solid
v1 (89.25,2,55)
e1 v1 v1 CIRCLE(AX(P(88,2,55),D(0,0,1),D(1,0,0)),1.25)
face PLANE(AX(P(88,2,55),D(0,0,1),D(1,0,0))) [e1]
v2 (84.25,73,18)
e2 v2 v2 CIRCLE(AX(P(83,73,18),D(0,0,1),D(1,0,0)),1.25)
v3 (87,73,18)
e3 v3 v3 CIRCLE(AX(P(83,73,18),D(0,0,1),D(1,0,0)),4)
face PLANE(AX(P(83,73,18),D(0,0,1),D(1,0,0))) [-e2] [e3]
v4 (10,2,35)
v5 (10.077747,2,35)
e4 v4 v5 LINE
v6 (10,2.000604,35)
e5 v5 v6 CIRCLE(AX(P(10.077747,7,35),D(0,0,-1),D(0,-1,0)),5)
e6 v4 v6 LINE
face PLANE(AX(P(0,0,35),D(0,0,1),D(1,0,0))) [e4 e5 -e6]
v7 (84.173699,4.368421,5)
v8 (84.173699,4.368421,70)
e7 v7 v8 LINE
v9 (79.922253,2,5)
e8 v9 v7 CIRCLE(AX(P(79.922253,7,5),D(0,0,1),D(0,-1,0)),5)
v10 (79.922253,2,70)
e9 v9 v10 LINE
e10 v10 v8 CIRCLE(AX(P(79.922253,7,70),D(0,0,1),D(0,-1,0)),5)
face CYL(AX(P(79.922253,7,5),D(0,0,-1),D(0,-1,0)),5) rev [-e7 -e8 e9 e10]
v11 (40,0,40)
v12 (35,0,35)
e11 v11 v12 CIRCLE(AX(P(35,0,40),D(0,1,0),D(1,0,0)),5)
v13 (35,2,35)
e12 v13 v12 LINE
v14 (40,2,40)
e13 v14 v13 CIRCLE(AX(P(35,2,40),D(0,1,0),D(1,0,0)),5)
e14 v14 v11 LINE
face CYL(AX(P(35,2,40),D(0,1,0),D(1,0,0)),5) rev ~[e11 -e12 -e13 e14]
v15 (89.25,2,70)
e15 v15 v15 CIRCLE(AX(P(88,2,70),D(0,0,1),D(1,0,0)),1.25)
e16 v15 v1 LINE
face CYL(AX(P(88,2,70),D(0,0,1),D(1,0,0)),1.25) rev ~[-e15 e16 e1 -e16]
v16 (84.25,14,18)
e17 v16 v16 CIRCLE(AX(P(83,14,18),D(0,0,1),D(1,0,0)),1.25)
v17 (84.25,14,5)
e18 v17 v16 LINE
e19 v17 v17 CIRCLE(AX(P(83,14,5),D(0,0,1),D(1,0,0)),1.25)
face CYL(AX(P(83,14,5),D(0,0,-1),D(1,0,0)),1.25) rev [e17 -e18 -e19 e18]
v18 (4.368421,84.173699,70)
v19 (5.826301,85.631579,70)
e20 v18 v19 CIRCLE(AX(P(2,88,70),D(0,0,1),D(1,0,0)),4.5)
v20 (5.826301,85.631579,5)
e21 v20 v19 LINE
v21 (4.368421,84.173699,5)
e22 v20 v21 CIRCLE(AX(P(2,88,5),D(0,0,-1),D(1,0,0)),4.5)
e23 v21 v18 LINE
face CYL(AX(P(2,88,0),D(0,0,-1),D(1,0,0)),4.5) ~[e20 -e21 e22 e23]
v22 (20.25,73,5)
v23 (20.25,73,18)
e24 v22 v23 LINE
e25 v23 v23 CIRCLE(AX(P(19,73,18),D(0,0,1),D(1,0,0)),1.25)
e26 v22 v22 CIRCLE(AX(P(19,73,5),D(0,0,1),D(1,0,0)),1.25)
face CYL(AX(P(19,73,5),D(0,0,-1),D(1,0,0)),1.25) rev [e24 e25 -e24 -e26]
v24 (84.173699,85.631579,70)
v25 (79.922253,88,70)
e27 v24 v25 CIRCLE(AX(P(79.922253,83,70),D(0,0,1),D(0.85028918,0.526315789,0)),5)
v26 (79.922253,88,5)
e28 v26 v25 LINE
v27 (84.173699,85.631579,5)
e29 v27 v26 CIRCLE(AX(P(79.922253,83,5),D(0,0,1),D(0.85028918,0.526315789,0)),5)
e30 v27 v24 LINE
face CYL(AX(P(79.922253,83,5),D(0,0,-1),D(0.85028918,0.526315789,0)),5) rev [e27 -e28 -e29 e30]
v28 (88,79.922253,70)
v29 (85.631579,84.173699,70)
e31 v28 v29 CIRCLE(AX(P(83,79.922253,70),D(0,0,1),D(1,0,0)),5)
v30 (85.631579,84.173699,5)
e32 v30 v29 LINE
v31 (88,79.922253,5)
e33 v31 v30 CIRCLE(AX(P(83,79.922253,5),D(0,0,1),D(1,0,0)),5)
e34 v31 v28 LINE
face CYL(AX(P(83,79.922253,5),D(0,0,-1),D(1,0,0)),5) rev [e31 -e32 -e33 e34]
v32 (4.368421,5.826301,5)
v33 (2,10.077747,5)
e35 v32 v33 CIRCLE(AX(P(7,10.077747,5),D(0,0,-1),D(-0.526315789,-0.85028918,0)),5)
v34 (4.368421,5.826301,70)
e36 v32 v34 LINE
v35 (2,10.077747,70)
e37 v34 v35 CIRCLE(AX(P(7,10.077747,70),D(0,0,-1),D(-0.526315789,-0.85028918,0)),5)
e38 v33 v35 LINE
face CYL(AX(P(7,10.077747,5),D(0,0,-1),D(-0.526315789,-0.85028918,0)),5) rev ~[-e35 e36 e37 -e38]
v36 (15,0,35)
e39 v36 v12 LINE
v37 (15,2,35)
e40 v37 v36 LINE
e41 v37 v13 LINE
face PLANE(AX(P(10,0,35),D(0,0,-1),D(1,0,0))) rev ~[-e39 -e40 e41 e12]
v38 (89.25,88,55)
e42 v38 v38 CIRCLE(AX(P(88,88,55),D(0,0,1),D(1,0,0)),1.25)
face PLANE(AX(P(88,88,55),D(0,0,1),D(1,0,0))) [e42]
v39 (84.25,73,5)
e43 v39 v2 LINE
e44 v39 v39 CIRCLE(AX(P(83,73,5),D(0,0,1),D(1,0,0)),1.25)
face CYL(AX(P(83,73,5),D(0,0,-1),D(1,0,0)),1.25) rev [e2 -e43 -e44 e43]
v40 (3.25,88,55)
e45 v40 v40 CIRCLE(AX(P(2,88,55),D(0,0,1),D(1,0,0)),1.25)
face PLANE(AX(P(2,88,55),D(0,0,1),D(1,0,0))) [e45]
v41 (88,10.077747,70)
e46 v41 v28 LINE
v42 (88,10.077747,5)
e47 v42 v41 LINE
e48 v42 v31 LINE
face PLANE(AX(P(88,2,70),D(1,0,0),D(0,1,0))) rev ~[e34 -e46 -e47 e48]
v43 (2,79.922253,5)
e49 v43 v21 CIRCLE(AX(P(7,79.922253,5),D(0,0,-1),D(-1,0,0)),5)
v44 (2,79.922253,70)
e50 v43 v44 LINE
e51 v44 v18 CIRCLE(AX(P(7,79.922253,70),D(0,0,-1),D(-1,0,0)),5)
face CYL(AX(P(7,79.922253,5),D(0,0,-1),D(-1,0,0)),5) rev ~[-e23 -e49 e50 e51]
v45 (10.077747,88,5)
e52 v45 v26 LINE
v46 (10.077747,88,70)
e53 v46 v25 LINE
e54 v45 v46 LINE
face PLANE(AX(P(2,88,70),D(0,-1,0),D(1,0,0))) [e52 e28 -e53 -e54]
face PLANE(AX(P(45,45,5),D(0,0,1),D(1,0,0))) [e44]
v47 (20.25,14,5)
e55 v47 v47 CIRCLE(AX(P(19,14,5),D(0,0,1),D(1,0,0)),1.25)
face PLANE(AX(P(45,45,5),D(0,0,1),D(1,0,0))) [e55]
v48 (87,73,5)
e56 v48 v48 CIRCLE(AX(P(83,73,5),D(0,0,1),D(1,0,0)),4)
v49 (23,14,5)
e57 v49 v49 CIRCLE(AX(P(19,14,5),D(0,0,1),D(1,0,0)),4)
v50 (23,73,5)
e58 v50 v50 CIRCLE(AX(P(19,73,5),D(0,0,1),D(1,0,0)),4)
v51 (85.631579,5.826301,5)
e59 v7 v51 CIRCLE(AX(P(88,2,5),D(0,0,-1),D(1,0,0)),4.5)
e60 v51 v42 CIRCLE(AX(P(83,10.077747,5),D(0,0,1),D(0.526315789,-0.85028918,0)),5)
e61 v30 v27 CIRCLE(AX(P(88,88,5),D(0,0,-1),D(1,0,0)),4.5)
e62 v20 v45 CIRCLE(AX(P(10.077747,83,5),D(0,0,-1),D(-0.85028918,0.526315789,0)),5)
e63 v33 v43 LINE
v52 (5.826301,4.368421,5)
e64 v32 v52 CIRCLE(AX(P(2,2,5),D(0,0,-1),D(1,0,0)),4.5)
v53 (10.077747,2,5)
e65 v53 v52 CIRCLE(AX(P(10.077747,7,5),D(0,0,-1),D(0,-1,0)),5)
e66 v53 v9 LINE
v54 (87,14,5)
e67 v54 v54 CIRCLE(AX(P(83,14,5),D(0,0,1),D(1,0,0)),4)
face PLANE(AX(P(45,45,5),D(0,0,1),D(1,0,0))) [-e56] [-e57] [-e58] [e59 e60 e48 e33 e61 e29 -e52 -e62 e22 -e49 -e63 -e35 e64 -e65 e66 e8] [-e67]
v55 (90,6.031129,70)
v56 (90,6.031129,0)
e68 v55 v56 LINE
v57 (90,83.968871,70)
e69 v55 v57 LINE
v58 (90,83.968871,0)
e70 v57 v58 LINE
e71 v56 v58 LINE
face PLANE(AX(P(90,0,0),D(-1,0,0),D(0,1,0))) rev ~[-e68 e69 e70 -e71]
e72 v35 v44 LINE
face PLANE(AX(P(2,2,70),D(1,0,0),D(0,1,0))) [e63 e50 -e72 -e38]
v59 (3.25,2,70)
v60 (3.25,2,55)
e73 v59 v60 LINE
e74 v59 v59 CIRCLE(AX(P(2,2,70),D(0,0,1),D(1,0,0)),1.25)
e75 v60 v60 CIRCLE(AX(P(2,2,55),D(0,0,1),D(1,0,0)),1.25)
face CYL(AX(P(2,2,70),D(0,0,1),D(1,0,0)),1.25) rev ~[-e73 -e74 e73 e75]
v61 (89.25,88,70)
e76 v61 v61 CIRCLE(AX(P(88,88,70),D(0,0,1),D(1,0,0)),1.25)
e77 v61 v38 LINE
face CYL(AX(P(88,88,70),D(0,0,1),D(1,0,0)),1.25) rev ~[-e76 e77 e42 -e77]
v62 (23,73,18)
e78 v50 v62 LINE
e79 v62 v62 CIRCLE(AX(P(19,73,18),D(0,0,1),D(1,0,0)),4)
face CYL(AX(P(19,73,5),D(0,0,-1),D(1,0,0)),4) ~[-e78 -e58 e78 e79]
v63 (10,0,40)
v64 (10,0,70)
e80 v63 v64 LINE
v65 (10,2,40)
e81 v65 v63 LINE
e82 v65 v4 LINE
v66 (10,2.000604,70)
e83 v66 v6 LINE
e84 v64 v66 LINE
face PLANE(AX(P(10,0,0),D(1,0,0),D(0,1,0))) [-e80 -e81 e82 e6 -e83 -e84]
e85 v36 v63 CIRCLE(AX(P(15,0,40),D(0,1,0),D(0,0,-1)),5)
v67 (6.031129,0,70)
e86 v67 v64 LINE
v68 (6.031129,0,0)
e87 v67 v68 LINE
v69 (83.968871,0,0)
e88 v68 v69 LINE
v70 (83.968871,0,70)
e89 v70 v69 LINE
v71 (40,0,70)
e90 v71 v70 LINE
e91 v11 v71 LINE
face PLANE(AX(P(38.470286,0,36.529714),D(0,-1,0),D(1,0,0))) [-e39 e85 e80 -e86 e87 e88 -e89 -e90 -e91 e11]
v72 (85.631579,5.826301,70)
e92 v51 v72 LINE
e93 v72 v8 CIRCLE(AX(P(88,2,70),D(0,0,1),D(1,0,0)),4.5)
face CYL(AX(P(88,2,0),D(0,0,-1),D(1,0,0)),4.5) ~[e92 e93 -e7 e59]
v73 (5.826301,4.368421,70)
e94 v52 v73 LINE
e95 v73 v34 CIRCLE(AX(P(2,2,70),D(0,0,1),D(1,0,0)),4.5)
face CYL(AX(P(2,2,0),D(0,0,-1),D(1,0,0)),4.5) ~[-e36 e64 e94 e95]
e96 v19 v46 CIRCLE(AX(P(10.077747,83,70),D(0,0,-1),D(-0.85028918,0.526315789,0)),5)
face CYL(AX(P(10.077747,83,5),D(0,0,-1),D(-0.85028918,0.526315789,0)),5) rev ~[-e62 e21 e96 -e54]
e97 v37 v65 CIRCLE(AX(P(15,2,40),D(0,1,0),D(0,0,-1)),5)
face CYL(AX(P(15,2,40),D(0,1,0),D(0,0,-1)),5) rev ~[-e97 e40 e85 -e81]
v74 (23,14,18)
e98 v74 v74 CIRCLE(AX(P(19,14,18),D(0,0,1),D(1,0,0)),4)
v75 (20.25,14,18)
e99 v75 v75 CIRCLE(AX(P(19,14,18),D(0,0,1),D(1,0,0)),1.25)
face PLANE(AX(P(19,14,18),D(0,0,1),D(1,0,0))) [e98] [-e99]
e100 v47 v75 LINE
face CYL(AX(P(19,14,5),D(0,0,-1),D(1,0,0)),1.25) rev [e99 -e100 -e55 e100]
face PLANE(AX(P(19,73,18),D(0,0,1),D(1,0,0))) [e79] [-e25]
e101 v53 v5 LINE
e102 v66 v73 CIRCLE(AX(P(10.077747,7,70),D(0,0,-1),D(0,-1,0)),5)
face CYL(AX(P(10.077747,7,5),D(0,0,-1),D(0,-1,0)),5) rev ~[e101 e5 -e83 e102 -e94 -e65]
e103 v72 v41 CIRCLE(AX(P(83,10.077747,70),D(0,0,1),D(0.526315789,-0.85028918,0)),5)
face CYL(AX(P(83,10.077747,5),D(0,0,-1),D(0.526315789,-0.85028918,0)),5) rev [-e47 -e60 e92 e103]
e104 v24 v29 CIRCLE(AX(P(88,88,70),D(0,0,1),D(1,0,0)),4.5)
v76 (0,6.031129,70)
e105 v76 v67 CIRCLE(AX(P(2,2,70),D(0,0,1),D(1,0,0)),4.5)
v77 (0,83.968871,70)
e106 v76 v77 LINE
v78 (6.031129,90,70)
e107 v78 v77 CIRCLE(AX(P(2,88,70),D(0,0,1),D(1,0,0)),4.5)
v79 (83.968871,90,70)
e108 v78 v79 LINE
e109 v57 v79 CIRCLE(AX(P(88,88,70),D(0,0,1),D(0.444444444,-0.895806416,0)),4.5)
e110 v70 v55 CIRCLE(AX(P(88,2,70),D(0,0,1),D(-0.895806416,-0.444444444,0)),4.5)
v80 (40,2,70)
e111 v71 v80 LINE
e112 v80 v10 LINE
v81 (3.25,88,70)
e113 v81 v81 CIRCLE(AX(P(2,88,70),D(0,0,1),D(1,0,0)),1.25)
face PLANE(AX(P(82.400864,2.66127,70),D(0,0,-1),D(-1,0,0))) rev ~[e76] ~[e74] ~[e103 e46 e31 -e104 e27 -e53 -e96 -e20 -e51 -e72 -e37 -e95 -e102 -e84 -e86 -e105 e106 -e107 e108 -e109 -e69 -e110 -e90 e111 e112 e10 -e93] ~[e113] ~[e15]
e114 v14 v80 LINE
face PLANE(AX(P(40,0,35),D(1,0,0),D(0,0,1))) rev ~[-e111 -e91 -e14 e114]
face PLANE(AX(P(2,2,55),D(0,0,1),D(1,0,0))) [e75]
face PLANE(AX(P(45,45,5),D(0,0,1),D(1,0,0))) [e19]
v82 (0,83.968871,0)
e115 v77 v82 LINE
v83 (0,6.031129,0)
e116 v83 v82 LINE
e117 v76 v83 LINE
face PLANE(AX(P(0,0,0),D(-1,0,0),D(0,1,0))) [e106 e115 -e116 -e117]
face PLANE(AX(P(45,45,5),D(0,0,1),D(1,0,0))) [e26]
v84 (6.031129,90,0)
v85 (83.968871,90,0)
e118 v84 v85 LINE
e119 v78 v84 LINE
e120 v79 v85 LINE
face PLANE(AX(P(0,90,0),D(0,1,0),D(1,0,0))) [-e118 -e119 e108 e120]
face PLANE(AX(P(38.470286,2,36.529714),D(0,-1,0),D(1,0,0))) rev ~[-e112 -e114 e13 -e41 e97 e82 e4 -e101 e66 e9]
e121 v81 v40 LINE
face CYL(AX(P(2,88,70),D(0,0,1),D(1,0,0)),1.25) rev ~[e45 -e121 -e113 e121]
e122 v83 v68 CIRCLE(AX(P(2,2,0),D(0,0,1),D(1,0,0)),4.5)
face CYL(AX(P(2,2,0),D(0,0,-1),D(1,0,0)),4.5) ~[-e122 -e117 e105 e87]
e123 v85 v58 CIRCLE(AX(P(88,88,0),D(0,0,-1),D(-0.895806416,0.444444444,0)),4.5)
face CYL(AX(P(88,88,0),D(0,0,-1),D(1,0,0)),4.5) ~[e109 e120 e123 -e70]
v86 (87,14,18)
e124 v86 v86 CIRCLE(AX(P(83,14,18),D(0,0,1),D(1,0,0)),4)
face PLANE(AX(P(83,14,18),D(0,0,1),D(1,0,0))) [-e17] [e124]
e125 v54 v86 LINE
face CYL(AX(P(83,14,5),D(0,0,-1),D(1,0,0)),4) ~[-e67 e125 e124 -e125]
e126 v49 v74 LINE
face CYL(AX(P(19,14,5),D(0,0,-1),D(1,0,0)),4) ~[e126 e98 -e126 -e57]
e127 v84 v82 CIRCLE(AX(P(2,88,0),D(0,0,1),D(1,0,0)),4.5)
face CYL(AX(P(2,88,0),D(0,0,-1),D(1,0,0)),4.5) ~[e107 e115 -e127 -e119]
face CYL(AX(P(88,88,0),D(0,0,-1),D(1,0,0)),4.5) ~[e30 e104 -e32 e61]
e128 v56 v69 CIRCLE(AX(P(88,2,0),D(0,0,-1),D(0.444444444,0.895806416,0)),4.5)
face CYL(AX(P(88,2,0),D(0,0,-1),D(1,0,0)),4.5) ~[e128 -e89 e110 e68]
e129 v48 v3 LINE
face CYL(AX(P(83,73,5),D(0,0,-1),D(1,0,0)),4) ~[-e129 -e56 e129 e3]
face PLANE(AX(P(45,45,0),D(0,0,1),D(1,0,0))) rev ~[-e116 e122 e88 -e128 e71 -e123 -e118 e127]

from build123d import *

# Parameters (mm, degrees)
F0_W          = 90
F0_H          = 90
F1_DEPTH      = 70
F2_W          = 86
F2_H          = 86
F3_DEPTH      = 65
F4_R          = 4.5
F5_DEPTH      = 70
F6_W          = 30
F6_H          = 35
F7_DEPTH      = 2
F8_R          = 1.25
F9_DEPTH      = 15
F10_R         = 4
F10_R_2       = 1.25
F11_DEPTH     = 13
F12_T1_DEPTH  = 2
F12_T3_DEPTH  = 65
F12_T8_DEPTH  = 73.9443680268
F12_T13_DEPTH = 65


# Not quite as in the source:
# - a fillet or chamfer that OpenCascade refuses, or shapes differently, is made with other operations: its cross-section is extruded or revolved along the edge and cut away or added
# - a feature of the source that left no trace in its solid (it failed there, or was rolled back) is left out


with BuildPart() as f1:
    # F0 (on Top) → F1 (new body)
    with BuildSketch(Plane.XY):
        with Locations((45, 45)):
            Rectangle(F0_W, F0_H)
    extrude(amount=F1_DEPTH)

    # F2 (on face) → F3 (cut)
    with BuildSketch(Plane.XY.offset(70)):
        with Locations((45, 45)):
            Rectangle(F2_W, F2_H)
    extrude(amount=-F3_DEPTH, mode=Mode.SUBTRACT)

    # F4 (on Top) → F5 (join)
    with BuildSketch(Plane.XY):
        with Locations((2, 88)):
            Circle(F4_R)
        with Locations((88, 88)):
            Circle(F4_R)
        with Locations((2, 2)):
            Circle(F4_R)
        with Locations((88, 2)):
            Circle(F4_R)
    extrude(amount=F5_DEPTH)

    # F6 (on Front) → F7 (cut, through all)
    with BuildSketch(Plane.XZ):
        with Locations((25, 52.5)):
            Rectangle(F6_W, F6_H)
    extrude(amount=-F7_DEPTH, mode=Mode.SUBTRACT)

    # F8 (on face) → F9 (cut)
    with BuildSketch(Plane.XY.offset(70)):
        with Locations((2, 88)):
            Circle(F8_R)
        with Locations((88, 88)):
            Circle(F8_R)
        with Locations((2, 2)):
            Circle(F8_R)
        with Locations((88, 2)):
            Circle(F8_R)
    extrude(amount=-F9_DEPTH, mode=Mode.SUBTRACT)

    # F10 (on face) → F11 (join)
    with BuildSketch(Plane.XY.offset(5)):
        with Locations((19, 73)):
            Circle(F10_R)
        with Locations((19, 73)):
            Circle(F10_R_2, mode=Mode.SUBTRACT)
        with Locations((83, 73)):
            Circle(F10_R)
        with Locations((83, 73)):
            Circle(F10_R_2, mode=Mode.SUBTRACT)
        with Locations((83, 14)):
            Circle(F10_R)
        with Locations((83, 14)):
            Circle(F10_R_2, mode=Mode.SUBTRACT)
        with Locations((19, 14)):
            Circle(F10_R)
        with Locations((19, 14)):
            Circle(F10_R_2, mode=Mode.SUBTRACT)
    extrude(amount=F11_DEPTH)

    # F12: fillet of radius 5 on 10 edges, made by hand

    # F12_s2 → F12_t1 (join)
    with BuildSketch(Plane.XZ.offset(-2)):
        with BuildLine():
            ThreePointArc((40, 40), (38.5355339059, 36.4644660941), (35, 35))
            Line((35, 35), (40, 35))
            Line((40, 35), (40, 40))
        make_face()
        with BuildLine():
            ThreePointArc((15, 35), (11.4644660941, 36.4644660941), (10, 40))
            Line((10, 40), (10, 35))
            Line((10, 35), (15, 35))
        make_face()
    extrude(amount=F12_T1_DEPTH)

    # F12_s4 → F12_t3 (join)
    with BuildSketch(Plane.XY.offset(5)):
        with BuildLine():
            ThreePointArc((79.9222527893, 2), (82.3555741063, 2.6320545598), (84.1736986897, 4.3684210526))
            ThreePointArc((84.1736986897, 4.3684210526), (83.6717003398, 3.2311872529), (83.5, 2))
            Line((83.5, 2), (79.9222527893, 2))
        make_face()
        with BuildLine():
            ThreePointArc((85.6315789474, 5.8263013103), (87.3679454402, 7.6444258937), (88, 10.0777472107))
            Line((88, 10.0777472107), (88, 6.5))
            ThreePointArc((88, 6.5), (86.7688127471, 6.3282996602), (85.6315789474, 5.8263013103))
        make_face()
        with BuildLine():
            ThreePointArc((4.3684210526, 5.8263013103), (2.6320545598, 7.6444258937), (2, 10.0777472107))
            Line((2, 10.0777472107), (2, 6.5))
            ThreePointArc((2, 6.5), (3.2311872529, 6.3282996602), (4.3684210526, 5.8263013103))
        make_face()
        with BuildLine():
            ThreePointArc((88, 79.9222527893), (87.3679454402, 82.3555741063), (85.6315789474, 84.1736986897))
            ThreePointArc((85.6315789474, 84.1736986897), (86.7688127471, 83.6717003398), (88, 83.5))
            Line((88, 83.5), (88, 79.9222527893))
        make_face()
        with BuildLine():
            ThreePointArc((2, 79.9222527893), (2.6320545598, 82.3555741063), (4.3684210526, 84.1736986897))
            ThreePointArc((4.3684210526, 84.1736986897), (3.2311872529, 83.6717003398), (2, 83.5))
            Line((2, 83.5), (2, 79.9222527893))
        make_face()
        with BuildLine():
            ThreePointArc((84.1736986897, 85.6315789474), (82.3555741063, 87.3679454402), (79.9222527893, 88))
            Line((79.9222527893, 88), (83.5, 88))
            ThreePointArc((83.5, 88), (83.6717003398, 86.7688127471), (84.1736986897, 85.6315789474))
        make_face()
        with BuildLine():
            ThreePointArc((5.8263013103, 85.6315789474), (7.6444258937, 87.3679454402), (10.0777472107, 88))
            Line((10.0777472107, 88), (6.5, 88))
            ThreePointArc((6.5, 88), (6.3282996602, 86.7688127471), (5.8263013103, 85.6315789474))
        make_face()
    extrude(amount=F12_T3_DEPTH)


with BuildPart() as f12_tool6:
    # F12_s7 → F12_t8 (new body)
    with BuildSketch(Plane.XY.offset(5)):
        with BuildLine():
            ThreePointArc((10.0777472107, 2), (7.6444258937, 2.6320545598), (5.8263013103, 4.3684210526))
            ThreePointArc((5.8263013103, 4.3684210526), (6.3282996602, 3.2311872529), (6.5, 2))
            Line((6.5, 2), (10.0777472107, 2))
        make_face()
    extrude(amount=F12_T8_DEPTH)

    split(bisect_by=Plane.XY.offset(35), keep=Keep.BOTTOM)


with BuildPart() as f1_1:
    add(f1.part)

    # F12_t5: union F12_tool6
    add(f12_tool6.part)


with BuildPart() as f12_tool11:
    # F12_s12 → F12_t13 (new body)
    with BuildSketch(Plane.XY.offset(5)):
        with BuildLine():
            ThreePointArc((10.0777472107, 2), (7.6444258937, 2.6320545598), (5.8263013103, 4.3684210526))
            ThreePointArc((5.8263013103, 4.3684210526), (6.3282996602, 3.2311872529), (6.5, 2))
            Line((6.5, 2), (10.0777472107, 2))
        make_face()
    extrude(amount=F12_T13_DEPTH)

    split(bisect_by=Plane.YZ.offset(10), keep=Keep.BOTTOM)


with BuildPart() as f1_2:
    add(f1_1.part)

    # F12_t10: union F12_tool11
    add(f12_tool11.part)


solid = f1_2.part
